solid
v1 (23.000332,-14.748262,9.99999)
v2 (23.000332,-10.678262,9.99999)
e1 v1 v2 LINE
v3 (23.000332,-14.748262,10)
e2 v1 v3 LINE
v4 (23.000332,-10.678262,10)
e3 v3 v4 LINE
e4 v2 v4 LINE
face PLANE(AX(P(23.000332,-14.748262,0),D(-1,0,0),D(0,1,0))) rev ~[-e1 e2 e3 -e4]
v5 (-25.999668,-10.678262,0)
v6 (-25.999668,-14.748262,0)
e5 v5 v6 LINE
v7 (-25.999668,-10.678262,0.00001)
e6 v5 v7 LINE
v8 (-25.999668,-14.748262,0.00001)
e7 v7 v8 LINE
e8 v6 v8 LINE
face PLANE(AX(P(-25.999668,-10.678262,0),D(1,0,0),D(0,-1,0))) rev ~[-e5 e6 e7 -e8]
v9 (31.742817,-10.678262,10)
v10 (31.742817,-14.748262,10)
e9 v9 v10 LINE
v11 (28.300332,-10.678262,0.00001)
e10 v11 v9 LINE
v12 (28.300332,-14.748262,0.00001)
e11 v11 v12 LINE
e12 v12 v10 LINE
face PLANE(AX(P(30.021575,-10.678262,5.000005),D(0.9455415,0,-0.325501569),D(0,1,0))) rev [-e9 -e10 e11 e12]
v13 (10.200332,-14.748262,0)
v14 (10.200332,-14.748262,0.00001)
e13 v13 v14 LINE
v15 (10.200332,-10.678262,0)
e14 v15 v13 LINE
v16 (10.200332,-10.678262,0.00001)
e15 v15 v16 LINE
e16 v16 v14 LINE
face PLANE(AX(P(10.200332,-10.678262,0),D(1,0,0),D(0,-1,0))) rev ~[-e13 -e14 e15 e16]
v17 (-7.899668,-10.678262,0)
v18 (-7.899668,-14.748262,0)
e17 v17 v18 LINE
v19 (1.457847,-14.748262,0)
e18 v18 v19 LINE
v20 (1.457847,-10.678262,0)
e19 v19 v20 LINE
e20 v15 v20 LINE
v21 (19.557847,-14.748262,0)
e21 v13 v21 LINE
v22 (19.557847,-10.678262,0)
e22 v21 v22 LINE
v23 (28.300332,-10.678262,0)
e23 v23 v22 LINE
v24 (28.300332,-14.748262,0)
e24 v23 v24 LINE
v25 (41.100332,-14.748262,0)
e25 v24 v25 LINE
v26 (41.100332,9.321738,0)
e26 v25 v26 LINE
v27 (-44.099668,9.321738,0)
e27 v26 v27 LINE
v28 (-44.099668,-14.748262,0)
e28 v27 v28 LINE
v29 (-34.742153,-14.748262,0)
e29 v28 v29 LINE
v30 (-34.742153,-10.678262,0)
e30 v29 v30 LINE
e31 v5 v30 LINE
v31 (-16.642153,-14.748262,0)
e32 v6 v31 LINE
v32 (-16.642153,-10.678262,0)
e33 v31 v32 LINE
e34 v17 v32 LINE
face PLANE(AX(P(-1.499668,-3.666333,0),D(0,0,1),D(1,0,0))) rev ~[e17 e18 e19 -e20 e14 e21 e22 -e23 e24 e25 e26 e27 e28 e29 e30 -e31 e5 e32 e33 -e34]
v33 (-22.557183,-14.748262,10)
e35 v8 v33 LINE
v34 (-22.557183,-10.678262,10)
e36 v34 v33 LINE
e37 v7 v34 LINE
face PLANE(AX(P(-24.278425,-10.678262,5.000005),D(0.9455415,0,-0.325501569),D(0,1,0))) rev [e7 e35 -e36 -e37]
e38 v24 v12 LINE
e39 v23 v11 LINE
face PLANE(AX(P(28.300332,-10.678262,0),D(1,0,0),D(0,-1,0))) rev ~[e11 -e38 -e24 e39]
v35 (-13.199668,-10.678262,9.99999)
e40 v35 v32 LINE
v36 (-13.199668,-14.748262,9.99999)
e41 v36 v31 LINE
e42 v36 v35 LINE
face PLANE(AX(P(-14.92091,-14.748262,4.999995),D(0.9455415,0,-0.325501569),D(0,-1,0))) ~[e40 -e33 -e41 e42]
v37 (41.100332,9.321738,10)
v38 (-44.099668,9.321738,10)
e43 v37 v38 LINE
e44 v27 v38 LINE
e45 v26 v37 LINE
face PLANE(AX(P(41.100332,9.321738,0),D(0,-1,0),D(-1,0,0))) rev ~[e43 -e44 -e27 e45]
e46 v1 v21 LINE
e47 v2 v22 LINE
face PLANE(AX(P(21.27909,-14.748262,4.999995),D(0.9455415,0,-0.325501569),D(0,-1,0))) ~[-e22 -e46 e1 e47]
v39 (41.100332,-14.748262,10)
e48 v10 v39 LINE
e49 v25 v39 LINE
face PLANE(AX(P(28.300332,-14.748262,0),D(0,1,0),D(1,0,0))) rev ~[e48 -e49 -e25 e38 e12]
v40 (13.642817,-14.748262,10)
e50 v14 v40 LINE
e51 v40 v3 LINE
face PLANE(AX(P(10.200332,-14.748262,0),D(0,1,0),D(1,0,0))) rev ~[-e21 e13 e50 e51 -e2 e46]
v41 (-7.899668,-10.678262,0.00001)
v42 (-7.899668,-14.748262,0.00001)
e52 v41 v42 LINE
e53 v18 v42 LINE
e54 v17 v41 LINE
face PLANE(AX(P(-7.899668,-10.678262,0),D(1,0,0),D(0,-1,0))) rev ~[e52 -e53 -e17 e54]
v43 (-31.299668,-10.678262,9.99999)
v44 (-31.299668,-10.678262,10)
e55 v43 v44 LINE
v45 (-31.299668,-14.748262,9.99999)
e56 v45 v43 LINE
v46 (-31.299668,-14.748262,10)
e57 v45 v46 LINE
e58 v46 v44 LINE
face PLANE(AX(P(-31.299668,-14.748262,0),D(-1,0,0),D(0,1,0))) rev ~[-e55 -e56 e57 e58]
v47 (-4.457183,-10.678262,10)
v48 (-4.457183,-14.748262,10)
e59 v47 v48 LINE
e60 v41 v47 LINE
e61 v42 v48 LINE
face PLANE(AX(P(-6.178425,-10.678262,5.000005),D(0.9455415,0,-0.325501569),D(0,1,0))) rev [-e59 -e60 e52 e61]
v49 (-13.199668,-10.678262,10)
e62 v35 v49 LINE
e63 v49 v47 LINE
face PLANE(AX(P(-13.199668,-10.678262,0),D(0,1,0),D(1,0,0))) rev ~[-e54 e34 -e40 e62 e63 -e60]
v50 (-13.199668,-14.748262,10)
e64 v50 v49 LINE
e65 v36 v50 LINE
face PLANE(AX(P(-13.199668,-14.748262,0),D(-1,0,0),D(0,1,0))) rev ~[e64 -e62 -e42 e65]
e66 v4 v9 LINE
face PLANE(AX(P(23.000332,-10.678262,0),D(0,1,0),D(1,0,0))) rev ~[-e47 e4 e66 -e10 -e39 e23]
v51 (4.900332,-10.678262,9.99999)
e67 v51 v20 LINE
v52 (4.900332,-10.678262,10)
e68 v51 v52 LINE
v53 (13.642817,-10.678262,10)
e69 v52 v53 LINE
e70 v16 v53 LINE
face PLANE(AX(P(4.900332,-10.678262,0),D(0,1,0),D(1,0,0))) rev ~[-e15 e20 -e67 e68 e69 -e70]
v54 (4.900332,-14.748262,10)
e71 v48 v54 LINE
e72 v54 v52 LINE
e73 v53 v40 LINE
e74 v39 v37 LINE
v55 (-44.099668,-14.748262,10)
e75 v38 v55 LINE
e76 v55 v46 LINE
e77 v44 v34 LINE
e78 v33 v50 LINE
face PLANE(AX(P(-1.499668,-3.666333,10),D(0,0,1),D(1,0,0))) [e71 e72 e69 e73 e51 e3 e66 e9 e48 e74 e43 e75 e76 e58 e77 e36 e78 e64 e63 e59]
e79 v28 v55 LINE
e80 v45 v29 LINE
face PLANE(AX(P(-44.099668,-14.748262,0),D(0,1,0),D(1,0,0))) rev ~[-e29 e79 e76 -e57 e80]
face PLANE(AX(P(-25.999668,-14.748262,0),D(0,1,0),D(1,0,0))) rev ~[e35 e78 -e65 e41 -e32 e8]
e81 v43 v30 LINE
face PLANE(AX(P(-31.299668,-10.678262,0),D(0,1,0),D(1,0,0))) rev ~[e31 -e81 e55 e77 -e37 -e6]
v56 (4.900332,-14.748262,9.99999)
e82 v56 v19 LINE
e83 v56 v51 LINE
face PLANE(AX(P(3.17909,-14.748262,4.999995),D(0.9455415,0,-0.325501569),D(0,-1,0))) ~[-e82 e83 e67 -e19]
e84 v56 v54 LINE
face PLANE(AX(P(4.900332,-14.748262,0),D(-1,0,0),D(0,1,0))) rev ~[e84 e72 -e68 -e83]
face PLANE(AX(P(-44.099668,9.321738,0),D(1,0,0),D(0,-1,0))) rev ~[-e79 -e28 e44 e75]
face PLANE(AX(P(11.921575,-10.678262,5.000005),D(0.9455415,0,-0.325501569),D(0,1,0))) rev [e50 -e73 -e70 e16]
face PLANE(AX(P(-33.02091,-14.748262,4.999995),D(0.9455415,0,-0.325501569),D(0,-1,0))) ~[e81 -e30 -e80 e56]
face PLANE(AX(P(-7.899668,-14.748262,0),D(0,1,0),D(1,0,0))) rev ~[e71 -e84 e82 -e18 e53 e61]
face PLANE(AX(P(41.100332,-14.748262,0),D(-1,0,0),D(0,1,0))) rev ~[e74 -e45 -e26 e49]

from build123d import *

# Parameters (mm, degrees)
F1_DEPTH = 10
F2_SIZE2 = 3.442485
F2_SIZE  = 9.99999
F3_SIZE2 = 3.442485
F3_SIZE  = 9.99999
F4_SIZE2 = 3.442485
F4_SIZE  = 9.99999
F5_SIZE2 = 3.442485
F5_SIZE  = 9.99999
F6_SIZE2 = 3.442485
F6_SIZE  = 9.99999
F7_SIZE2 = 3.442485
F7_SIZE  = 9.99999
F8_SIZE2 = 3.442485
F8_SIZE  = 9.99999
F9_SIZE2 = 3.442485
F9_SIZE  = 9.99999


# Not quite as in the source:
# - a fillet or chamfer is up to 0.001 mm smaller than in the source, because OpenCascade refuses the exact size


with BuildPart() as f1:
    # F0 (on Top) → F1 (new body)
    with BuildSketch(Plane.XY):
        Polygon((41.1003320895, 9.3217377585), (-44.0996679105, 9.3217377585), (-44.0996679105, -10.6782622415), (-44.0996679105, -14.7482622415), (-31.2996679105, -14.7482622415), (-31.2996679105, -10.6782622415), (-25.9996679105, -10.6782622415), (-25.9996679105, -14.7482622415), (-13.1996679105, -14.7482622415), (-13.1996679105, -10.6782622415), (-7.8996679105, -10.6782622415), (-7.8996679105, -14.7482622415), (4.9003320895, -14.7482622415), (4.9003320895, -10.6782622415), (10.2003320895, -10.6782622415), (10.2003320895, -14.7482622415), (23.0003320895, -14.7482622415), (23.0003320895, -10.6782622415), (28.3003320895, -10.6782622415), (28.3003320895, -14.7482622415), (41.1003320895, -14.7482622415), (41.1003320895, -10.6782622415), align=None)
    extrude(amount=F1_DEPTH)

    # F2 (size 10 and 3.4424952484 in the source; OpenCascade refuses exactly that, so slightly less here)
    f2_edges = [f1.edges().sort_by_distance(p)[0] for p in [
        (-31.299668, -12.713262, 0),
    ]]
    f2_side = f1.faces().sort_by_distance((-31.299668, -12.713262, 5))[0]
    chamfer(f2_edges, length=F2_SIZE, length2=F2_SIZE2, reference=f2_side)

    # F3 (size 10 and 3.4424952484 in the source; OpenCascade refuses exactly that, so slightly less here)
    f3_edges = [f1.edges().sort_by_distance(p)[0] for p in [
        (-25.999668, -12.713262, 10),
    ]]
    f3_side = f1.faces().sort_by_distance((-25.999668, -12.713262, 5))[0]
    chamfer(f3_edges, length=F3_SIZE, length2=F3_SIZE2, reference=f3_side)

    # F4 (size 10 and 3.4424952484 in the source; OpenCascade refuses exactly that, so slightly less here)
    f4_edges = [f1.edges().sort_by_distance(p)[0] for p in [
        (-13.199668, -12.713262, 0),
    ]]
    f4_side = f1.faces().sort_by_distance((-13.199668, -12.713262, 5))[0]
    chamfer(f4_edges, length=F4_SIZE, length2=F4_SIZE2, reference=f4_side)

    # F5 (size 10 and 3.4424952484 in the source; OpenCascade refuses exactly that, so slightly less here)
    f5_edges = [f1.edges().sort_by_distance(p)[0] for p in [
        (-7.899668, -12.713262, 10),
    ]]
    f5_side = f1.faces().sort_by_distance((-7.899668, -12.713262, 5))[0]
    chamfer(f5_edges, length=F5_SIZE, length2=F5_SIZE2, reference=f5_side)

    # F6 (size 10 and 3.4424952484 in the source; OpenCascade refuses exactly that, so slightly less here)
    f6_edges = [f1.edges().sort_by_distance(p)[0] for p in [
        (4.900332, -12.713262, 0),
    ]]
    f6_side = f1.faces().sort_by_distance((4.900332, -12.713262, 5))[0]
    chamfer(f6_edges, length=F6_SIZE, length2=F6_SIZE2, reference=f6_side)

    # F7 (size 10 and 3.4424952484 in the source; OpenCascade refuses exactly that, so slightly less here)
    f7_edges = [f1.edges().sort_by_distance(p)[0] for p in [
        (10.200332, -12.713262, 10),
    ]]
    f7_side = f1.faces().sort_by_distance((10.200332, -12.713262, 5))[0]
    chamfer(f7_edges, length=F7_SIZE, length2=F7_SIZE2, reference=f7_side)

    # F8 (size 10 and 3.4424952484 in the source; OpenCascade refuses exactly that, so slightly less here)
    f8_edges = [f1.edges().sort_by_distance(p)[0] for p in [
        (23.000332, -12.713262, 0),
    ]]
    f8_side = f1.faces().sort_by_distance((23.000332, -12.713262, 5))[0]
    chamfer(f8_edges, length=F8_SIZE, length2=F8_SIZE2, reference=f8_side)

    # F9 (size 10 and 3.4424952484 in the source; OpenCascade refuses exactly that, so slightly less here)
    f9_edges = [f1.edges().sort_by_distance(p)[0] for p in [
        (28.300332, -12.713262, 10),
    ]]
    f9_side = f1.faces().sort_by_distance((28.300332, -12.713262, 5))[0]
    chamfer(f9_edges, length=F9_SIZE, length2=F9_SIZE2, reference=f9_side)


solid = f1.part
